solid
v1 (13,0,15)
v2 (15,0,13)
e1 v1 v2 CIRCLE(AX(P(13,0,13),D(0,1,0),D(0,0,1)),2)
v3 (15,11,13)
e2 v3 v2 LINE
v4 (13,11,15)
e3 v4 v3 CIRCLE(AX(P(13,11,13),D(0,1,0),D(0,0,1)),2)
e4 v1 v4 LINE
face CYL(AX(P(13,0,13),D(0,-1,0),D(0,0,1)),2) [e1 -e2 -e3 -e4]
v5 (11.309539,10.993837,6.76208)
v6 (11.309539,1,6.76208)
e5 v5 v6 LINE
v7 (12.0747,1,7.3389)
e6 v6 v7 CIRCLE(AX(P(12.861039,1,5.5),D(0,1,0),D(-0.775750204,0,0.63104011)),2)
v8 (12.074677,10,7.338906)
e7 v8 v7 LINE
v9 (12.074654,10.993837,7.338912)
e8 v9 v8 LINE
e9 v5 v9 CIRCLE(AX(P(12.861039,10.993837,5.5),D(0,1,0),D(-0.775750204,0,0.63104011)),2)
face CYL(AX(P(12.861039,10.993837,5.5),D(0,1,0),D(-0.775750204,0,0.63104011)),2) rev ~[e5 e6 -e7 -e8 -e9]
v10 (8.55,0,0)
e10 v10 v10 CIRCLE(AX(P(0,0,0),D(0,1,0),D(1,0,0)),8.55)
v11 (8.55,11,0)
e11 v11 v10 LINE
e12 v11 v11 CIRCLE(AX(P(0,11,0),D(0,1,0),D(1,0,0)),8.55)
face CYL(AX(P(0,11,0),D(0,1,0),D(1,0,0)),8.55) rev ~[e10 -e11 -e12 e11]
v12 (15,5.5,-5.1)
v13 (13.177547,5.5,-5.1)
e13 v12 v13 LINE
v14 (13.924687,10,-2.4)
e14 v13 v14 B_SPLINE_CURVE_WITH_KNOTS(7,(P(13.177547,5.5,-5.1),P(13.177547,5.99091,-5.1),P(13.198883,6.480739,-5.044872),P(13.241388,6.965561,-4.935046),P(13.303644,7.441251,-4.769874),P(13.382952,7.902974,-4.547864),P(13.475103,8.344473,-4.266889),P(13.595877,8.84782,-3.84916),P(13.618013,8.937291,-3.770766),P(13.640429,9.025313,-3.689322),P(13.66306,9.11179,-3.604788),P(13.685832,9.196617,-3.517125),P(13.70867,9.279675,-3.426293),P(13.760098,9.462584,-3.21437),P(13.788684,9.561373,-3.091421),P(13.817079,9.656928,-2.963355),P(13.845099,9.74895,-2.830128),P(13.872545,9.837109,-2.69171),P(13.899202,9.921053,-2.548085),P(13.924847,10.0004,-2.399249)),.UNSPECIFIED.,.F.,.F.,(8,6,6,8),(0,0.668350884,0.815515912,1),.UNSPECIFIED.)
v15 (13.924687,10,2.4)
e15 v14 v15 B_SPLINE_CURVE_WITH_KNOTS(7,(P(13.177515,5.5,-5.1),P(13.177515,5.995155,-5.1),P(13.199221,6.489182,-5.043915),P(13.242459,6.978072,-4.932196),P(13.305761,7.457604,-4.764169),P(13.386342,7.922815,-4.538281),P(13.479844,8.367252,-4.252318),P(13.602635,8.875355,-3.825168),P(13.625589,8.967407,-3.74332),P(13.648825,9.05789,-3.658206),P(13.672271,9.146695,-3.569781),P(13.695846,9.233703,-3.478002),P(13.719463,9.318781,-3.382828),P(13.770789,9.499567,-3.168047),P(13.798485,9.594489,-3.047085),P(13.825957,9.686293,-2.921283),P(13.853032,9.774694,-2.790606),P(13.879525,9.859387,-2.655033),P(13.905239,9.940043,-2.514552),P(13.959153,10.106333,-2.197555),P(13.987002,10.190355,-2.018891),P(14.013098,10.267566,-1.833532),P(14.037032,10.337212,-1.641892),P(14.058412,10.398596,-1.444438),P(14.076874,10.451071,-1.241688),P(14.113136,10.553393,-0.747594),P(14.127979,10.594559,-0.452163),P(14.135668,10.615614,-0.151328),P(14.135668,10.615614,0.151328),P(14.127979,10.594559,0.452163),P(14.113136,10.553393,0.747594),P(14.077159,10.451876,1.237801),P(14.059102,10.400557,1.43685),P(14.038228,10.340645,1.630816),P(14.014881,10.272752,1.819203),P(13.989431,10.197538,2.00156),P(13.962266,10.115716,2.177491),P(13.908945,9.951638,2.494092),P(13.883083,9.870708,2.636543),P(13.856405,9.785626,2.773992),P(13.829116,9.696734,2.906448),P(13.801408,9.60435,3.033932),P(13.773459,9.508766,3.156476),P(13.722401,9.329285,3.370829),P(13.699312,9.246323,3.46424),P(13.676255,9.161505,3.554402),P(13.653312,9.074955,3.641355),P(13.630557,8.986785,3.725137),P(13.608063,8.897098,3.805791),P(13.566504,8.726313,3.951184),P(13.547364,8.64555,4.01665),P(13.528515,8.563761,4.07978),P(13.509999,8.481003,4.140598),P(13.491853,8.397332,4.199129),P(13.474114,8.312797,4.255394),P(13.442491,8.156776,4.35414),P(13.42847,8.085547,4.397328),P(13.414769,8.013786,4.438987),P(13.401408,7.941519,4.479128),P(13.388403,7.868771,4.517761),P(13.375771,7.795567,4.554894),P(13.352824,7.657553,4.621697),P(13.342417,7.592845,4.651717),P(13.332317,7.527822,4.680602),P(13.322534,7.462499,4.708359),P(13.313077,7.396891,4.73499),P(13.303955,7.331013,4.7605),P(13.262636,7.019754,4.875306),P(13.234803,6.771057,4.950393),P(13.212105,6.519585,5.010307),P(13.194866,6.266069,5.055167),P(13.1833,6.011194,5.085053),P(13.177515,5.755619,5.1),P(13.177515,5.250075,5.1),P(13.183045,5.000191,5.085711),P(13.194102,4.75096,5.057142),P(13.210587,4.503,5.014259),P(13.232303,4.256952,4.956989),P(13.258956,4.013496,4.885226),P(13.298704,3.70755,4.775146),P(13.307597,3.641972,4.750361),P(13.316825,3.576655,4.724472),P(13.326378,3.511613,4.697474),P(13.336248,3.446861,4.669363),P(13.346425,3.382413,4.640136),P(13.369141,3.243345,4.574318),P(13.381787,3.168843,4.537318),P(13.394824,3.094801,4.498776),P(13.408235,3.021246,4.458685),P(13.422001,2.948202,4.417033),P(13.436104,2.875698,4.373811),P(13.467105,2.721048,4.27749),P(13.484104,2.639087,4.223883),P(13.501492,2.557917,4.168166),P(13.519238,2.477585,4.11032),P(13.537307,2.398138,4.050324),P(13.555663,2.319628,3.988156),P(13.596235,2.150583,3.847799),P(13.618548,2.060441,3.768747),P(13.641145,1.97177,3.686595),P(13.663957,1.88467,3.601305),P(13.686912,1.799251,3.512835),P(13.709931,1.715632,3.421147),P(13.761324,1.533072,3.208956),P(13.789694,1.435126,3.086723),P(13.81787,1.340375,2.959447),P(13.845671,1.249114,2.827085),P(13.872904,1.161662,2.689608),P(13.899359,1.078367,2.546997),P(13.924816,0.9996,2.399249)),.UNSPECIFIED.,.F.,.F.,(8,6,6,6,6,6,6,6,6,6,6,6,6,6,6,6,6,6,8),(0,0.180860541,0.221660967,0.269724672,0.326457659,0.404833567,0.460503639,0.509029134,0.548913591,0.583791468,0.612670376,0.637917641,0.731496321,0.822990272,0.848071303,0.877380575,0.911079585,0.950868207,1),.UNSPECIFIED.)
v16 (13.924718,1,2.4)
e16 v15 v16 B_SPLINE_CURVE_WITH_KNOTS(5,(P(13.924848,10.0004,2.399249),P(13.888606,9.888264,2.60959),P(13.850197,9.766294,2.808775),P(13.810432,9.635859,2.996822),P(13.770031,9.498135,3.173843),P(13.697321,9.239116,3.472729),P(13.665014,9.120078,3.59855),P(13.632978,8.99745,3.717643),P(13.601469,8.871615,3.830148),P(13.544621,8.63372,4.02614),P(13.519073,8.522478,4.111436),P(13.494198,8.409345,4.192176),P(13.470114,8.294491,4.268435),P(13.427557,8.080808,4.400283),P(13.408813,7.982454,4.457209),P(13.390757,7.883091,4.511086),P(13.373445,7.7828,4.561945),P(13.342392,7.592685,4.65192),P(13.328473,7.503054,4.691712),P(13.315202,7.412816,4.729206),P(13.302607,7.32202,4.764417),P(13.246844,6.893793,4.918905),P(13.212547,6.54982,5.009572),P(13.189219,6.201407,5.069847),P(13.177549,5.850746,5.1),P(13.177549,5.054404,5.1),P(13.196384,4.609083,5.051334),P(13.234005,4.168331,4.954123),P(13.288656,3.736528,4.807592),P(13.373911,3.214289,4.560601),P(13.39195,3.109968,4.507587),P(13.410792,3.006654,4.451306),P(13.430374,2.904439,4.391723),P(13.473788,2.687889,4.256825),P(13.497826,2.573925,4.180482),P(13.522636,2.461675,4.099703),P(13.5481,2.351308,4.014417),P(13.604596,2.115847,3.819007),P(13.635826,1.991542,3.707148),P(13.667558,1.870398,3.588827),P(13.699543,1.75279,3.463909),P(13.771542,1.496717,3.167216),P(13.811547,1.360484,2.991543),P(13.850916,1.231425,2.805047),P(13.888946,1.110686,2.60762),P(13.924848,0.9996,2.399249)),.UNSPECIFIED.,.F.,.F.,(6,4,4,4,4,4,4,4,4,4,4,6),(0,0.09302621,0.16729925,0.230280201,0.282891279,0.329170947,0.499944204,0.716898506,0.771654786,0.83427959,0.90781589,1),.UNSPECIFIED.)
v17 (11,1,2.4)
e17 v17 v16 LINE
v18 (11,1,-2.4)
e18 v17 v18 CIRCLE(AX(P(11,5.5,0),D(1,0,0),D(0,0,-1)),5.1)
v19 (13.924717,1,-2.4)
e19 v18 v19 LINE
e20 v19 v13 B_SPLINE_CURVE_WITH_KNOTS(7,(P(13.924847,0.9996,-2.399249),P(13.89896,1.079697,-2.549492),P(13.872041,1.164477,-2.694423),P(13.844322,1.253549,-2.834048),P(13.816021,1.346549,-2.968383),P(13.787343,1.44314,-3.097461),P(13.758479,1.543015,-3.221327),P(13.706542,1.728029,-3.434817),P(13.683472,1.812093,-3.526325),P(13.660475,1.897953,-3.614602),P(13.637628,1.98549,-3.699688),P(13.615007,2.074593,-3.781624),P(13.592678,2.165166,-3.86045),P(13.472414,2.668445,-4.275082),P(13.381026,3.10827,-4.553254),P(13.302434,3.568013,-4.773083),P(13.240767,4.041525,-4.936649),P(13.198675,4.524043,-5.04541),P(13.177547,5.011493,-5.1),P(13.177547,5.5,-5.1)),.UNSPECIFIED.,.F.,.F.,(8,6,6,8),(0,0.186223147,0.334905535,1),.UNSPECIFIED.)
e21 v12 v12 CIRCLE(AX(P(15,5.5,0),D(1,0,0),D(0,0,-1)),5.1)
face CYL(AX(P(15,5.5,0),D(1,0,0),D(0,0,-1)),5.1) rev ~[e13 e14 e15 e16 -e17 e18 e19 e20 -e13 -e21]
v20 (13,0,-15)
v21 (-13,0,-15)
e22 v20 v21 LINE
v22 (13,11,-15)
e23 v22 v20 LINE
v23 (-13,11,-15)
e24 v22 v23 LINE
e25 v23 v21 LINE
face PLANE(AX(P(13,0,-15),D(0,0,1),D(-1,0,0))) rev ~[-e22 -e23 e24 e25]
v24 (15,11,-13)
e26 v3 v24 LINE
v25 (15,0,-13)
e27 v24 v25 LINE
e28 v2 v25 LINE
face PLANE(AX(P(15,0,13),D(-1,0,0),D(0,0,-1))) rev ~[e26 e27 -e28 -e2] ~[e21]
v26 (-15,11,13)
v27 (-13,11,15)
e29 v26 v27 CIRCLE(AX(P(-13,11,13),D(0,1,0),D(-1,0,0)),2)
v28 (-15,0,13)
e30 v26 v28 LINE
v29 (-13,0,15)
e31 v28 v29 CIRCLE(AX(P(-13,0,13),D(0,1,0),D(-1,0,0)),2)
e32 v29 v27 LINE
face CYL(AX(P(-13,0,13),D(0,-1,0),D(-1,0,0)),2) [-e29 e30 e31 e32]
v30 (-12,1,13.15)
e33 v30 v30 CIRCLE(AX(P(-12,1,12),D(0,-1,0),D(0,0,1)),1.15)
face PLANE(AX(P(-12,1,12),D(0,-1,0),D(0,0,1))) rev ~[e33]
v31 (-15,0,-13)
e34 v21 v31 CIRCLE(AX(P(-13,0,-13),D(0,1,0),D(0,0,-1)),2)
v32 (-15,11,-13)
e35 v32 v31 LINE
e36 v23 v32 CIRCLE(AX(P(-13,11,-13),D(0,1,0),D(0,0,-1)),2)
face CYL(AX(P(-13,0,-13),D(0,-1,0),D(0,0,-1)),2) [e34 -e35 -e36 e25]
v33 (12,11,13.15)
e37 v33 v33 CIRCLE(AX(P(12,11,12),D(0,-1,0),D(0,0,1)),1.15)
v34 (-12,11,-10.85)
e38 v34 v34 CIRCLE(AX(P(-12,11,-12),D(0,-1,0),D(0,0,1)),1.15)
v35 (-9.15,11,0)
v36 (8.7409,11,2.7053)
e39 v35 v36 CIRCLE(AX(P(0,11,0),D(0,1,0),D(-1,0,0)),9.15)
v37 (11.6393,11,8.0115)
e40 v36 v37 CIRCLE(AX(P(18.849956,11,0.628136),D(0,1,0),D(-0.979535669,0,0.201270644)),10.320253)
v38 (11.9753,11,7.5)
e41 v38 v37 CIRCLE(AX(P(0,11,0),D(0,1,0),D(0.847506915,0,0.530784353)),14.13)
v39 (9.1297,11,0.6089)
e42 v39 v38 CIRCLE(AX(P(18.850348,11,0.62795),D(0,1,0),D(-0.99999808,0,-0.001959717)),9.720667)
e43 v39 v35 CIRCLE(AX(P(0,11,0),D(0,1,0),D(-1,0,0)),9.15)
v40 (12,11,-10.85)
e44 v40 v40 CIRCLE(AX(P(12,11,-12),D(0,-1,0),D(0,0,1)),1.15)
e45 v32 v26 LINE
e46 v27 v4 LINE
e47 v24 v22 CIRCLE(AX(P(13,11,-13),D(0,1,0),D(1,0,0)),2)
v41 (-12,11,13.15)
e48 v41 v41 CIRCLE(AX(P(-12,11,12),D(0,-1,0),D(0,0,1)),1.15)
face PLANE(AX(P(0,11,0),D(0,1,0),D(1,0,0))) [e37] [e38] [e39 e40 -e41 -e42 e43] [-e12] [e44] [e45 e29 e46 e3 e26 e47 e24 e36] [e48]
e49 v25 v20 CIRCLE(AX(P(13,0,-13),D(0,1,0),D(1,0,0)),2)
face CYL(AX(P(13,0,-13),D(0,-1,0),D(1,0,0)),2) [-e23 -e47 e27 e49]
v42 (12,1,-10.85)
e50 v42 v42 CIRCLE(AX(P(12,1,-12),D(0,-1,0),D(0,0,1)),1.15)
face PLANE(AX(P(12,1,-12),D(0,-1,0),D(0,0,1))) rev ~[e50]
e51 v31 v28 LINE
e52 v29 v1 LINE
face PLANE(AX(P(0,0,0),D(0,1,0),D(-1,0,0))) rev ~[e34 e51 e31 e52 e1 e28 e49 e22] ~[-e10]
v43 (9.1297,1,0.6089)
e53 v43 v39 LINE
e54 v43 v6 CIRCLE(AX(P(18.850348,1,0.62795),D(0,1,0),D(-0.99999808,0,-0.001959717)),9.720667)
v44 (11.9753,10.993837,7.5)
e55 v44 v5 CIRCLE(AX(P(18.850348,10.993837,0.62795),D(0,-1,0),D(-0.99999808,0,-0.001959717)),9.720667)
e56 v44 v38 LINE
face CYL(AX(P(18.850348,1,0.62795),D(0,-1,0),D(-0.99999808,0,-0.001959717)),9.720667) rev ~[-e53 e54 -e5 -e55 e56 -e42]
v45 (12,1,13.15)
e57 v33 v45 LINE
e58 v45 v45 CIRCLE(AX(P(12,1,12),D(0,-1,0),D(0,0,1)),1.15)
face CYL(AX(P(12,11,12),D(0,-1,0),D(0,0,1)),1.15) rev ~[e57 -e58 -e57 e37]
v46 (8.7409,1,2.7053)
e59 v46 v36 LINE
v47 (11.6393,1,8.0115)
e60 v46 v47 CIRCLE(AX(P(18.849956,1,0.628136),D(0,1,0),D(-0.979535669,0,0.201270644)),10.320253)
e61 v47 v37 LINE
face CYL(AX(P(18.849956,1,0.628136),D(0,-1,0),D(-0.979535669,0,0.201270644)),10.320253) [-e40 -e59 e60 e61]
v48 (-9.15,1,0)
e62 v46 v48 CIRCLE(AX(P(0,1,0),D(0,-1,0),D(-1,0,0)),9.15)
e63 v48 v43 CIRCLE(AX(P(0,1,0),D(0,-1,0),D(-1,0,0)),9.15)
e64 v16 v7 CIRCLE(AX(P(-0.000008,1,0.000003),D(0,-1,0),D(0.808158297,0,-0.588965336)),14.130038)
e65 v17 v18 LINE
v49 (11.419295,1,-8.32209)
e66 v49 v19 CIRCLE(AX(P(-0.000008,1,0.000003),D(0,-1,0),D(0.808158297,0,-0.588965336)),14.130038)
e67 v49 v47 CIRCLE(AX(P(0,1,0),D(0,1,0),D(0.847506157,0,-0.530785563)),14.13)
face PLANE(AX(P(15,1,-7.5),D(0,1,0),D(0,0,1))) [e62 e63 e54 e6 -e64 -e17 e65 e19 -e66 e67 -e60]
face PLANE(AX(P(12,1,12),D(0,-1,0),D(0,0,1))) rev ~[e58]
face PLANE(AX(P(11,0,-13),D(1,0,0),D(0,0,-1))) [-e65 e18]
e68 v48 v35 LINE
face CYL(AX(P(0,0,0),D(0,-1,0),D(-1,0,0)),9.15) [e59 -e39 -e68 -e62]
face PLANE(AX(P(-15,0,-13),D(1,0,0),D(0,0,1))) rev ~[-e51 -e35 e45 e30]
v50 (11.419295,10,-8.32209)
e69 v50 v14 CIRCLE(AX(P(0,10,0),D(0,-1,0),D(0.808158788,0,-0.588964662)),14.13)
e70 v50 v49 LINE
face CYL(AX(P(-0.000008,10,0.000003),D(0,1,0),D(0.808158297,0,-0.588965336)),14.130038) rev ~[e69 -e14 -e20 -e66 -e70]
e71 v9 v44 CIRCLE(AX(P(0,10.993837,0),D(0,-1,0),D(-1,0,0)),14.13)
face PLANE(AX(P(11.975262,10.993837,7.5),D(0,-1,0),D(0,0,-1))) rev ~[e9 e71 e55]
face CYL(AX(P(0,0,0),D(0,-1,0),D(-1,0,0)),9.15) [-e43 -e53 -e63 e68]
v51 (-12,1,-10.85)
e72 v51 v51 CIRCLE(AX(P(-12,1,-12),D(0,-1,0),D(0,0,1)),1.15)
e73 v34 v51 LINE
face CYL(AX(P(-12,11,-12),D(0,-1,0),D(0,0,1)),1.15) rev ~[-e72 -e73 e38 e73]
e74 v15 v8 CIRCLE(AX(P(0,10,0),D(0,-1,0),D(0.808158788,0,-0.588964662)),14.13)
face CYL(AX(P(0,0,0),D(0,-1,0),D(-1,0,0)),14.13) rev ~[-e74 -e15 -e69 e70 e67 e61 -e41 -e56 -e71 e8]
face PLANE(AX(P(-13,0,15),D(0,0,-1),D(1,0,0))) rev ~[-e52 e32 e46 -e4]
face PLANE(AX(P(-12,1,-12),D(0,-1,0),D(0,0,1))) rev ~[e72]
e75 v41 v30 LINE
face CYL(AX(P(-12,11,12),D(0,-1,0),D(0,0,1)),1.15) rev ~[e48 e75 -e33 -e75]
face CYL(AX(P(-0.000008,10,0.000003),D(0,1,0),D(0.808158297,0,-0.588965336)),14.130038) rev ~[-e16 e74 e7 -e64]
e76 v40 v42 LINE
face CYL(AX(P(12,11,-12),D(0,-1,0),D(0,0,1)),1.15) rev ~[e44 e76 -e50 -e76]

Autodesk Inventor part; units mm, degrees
ref_plane "YZ Plane" through (0, 0, 0) normal (1, 0, 0) x (0, 1, 0)
ref_plane "XZ Plane" through (0, 0, 0) normal (0, 1, 0) x (-1, 0, 0)
ref_plane "XY Plane" through (0, 0, 0) normal (0, 0, 1) x (1, 0, 0)
sketch "Sketch1" plane through (0, 0, 0) normal (0, 1, 0) x (-1, 0, 0)
  line L0 (13, 15) -> (-13, 15)
  line L1 (-15, 13) -> (-15, -13)
  line L2 (-13, -15) -> (13, -15)
  line L3 (15, -13) -> (15, 13)
  line L4 (15, 15) -> (-15, -15) construction
  line L5 (-15, 15) -> (15, -15) construction
  circle A0 centre (0, 0) radius 9.15
  circle A1 centre (0, 0) radius 14.13
  arc A2 (15, 13) -> (13, 15) centre (13, 13) ccw
  arc A3 (13, -15) -> (15, -13) centre (13, -13) ccw
  arc A4 (-15, -13) -> (-13, -15) centre (-13, -13) ccw
  arc A5 (-13, 15) -> (-15, 13) centre (-13, 13) ccw
  dimension "d0" = 30
  dimension "d1" = 30
  dimension "d2" = 18.3
  dimension "d3" = 28.26
  dimension "d4" = 2
extrude "Extrusion1" add sketch "Sketch1" along normal blind 11
sketch "Sketch2" plane through (0, 0, 0) normal (0, -1, 0) x (1, 0, 0)
  line L0 (-15, -13) -> (-15, 13) projected
  arc A0 (-13, 15) -> (-15, 13) centre (-13, 13) ccw projected
  line L1 (-13, 15) -> (13, 15) projected
  arc A1 (15, 13) -> (13, 15) centre (13, 13) ccw projected
  line L2 (15, 13) -> (15, -13) projected
  arc A2 (13, -15) -> (15, -13) centre (13, -13) ccw projected
  line L3 (13, -15) -> (-13, -15) projected
  arc A3 (-15, -13) -> (-13, -15) centre (-13, -13) ccw projected
  point P0 (0, 0)
extrude "Extrusion2" add sketch "Sketch2" against normal blind 1
sketch "Sketch3" plane through (0, 11, 0) normal (0, 1, 0) x (1, 0, 0)
  circle A0 centre (0, 0) radius 9.15 projected
  circle A1 centre (0, 0) radius 8.55
  dimension "d9" = 0.6
extrude "Extrusion3" cut sketch "Sketch3" against normal through all contours A1
sketch "Sketch4" plane through (0, 11, 0) normal (0, 1, 0) x (1, 0, 0)
  circle A0 centre (0, 0) radius 14.13 construction
  line L0 (-13, -15) -> (13, -15) construction
  arc A1 (13, -15) -> (15, -13) centre (13, -13) ccw construction
  line L1 (15, -13) -> (15, 13) construction
  arc A2 (15, 13) -> (13, 15) centre (13, 13) ccw construction
  line L2 (13, 15) -> (-13, 15) construction
  arc A3 (-13, 15) -> (-15, 13) centre (-13, 13) ccw construction
  line L3 (-15, 13) -> (-15, -13) construction
  arc A4 (-15, -13) -> (-13, -15) centre (-13, -13) ccw construction
  line L4 (-12, -12) -> (12, -12) construction
  line L5 (12, -12) -> (12, 12) construction
  line L6 (12, 12) -> (-12, 12) construction
  line L7 (-12, 12) -> (-12, -12) construction
  line L8 (-12, -12) -> (12, 12) construction
  line L9 (12, -12) -> (-12, 12) construction
  point P0 (0, 0)
  dimension "d12" = 24
  dimension "d13" = 24
hole "Hole1" at (-12, 11, 12) at (-12, 11, -12) at (12, 11, -12) at (12, 11, 12) direction (0, -1, 0) diameter 2.3 depth 10
sketch "Sketch5" plane through (15, 0, -13) normal (1, 0, 0) x (0, 0, -1)
  line L0 (0, 0) -> (0, 11) construction
  line L1 (-26, 11) -> (0, 11) construction
  line L2 (-26, 0) -> (-26, 11) construction
  line L3 (-26, 0) -> (0, 0) construction
  line L4 (-20.5, 10) -> (-5.5, 10)
  line L5 (-5.5, 10) -> (-5.5, 1)
  line L6 (-5.5, 1) -> (-20.5, 1)
  line L7 (-20.5, 1) -> (-20.5, 10)
  line L8 (-20.5, 10) -> (-5.5, 1) construction
  line L9 (-5.5, 10) -> (-20.5, 1) construction
  point P0 (-13, 0)
  point P1 (-13, 5.5)
  dimension "d21" = 15
  dimension "d22" = 9
extrude "Extrusion4" cut sketch "Sketch5" against normal blind 4
sketch "Sketch6" plane through (0, 1, 0) normal (0, 1, 0) x (1, 0, 0)
  line L0 (15, -7.5) -> (11.9753, -7.5) construction
  arc A0 (8.7409, -2.7053) -> (9.1297, -0.6089) centre (0, 0) ccw
  arc A1 (9.1297, -0.6089) -> (11.9753, -7.5) centre (18.8506, -0.6279) ccw
  arc A2 (8.7409, -2.7053) -> (11.6393, -8.0115) centre (18.8506, -0.6279) ccw
  arc A3 (11.6393, -8.0115) -> (11.9753, -7.5) centre (0, 0) ccw
  arc A4 (11.6393, -8.0115) -> (11.9753, -7.5) centre (0, 0) ccw
  dimension "d25" = 0.6
extrude "Extrusion5" add sketch "Sketch6" along normal up to surface (10 mm away)
fillet "Fillet1" radius 2 2 edges at (11.9753, 5.5, 7.5) (11.9753, 5.5, -7.5)
sketch "Sketch12" plane through (15, 10, -7.5) normal (0, -1, 0) x (1, 0, 0)
  arc A0 (-2.139, 15) -> (-2.9253, 14.8389) centre (-2.139, 13) ccw projected
  arc A1 (-3.5807, -0.8221) -> (-2.9253, 14.8389) centre (-15, 7.5) ccw projected
  arc A2 (-1.9644, 0) -> (-3.5807, -0.8221) centre (-1.9644, -2) ccw projected
  line L0 (0, 0) -> (-1.9644, 0) projected
  line L1 (0, 15) -> (0, 0) projected
  line L2 (0, 15) -> (-2.139, 15) projected
extrude "Extrusion10" add sketch "Sketch12" along normal up to surface (9 mm away)
sketch "Sketch13" plane through (15, 0, -13) normal (1, 0, 0) x (0, 0, -1)
  line L0 (0, 0) -> (0, 11) construction
  line L1 (-26, 11) -> (0, 11) construction
  line L2 (-26, 0) -> (-26, 11) construction
  line L3 (-26, 0) -> (0, 0) construction
  circle A0 centre (-13, 5.5) radius 5.1
  point P0 (-13, 0)
  dimension "d44" = 10.2
extrude "Extrusion11" cut sketch "Sketch13" against normal blind 4
sketch "Sketch8" plane through (20, 0, -13) normal (1, 0, 0) x (0, 0, -1)
  line L0 (-20.5, 10) -> (-5.5, 10) projected
  line L1 (-20.5, 1) -> (-20.5, 10) projected
  line L2 (-5.5, 1) -> (-20.5, 1) projected
  line L3 (-5.5, 10) -> (-5.5, 1) projected
  line L4 (-20.3, 9.8) -> (-5.7, 9.8)
  line L5 (-5.7, 9.8) -> (-5.7, 1.2)
  line L6 (-5.7, 1.2) -> (-20.3, 1.2)
  line L7 (-20.3, 1.2) -> (-20.3, 9.8)
  point P0 (-13, 0)
  dimension "d30" = 0.2
  dimension "d33" = 1
  dimension "d34" = 0.6
sketch "Sketch11" plane through (22.6, 0, -13) normal (1, 0, 0) x (0, 0, -1)
  line L0 (-21.3, 10.8) -> (-21.3, 0.2) construction
  line L1 (-21.3, 0.2) -> (-4.7, 0.2) construction
  line L2 (-4.7, 0.2) -> (-4.7, 10.8) construction
  line L3 (-4.7, 10.8) -> (-21.3, 10.8) construction
  circle A0 centre (-13, 5.5) radius 5.125
  point P0 (-13, 0)
  dimension "d39" = 10.25
properties part number "base2"
